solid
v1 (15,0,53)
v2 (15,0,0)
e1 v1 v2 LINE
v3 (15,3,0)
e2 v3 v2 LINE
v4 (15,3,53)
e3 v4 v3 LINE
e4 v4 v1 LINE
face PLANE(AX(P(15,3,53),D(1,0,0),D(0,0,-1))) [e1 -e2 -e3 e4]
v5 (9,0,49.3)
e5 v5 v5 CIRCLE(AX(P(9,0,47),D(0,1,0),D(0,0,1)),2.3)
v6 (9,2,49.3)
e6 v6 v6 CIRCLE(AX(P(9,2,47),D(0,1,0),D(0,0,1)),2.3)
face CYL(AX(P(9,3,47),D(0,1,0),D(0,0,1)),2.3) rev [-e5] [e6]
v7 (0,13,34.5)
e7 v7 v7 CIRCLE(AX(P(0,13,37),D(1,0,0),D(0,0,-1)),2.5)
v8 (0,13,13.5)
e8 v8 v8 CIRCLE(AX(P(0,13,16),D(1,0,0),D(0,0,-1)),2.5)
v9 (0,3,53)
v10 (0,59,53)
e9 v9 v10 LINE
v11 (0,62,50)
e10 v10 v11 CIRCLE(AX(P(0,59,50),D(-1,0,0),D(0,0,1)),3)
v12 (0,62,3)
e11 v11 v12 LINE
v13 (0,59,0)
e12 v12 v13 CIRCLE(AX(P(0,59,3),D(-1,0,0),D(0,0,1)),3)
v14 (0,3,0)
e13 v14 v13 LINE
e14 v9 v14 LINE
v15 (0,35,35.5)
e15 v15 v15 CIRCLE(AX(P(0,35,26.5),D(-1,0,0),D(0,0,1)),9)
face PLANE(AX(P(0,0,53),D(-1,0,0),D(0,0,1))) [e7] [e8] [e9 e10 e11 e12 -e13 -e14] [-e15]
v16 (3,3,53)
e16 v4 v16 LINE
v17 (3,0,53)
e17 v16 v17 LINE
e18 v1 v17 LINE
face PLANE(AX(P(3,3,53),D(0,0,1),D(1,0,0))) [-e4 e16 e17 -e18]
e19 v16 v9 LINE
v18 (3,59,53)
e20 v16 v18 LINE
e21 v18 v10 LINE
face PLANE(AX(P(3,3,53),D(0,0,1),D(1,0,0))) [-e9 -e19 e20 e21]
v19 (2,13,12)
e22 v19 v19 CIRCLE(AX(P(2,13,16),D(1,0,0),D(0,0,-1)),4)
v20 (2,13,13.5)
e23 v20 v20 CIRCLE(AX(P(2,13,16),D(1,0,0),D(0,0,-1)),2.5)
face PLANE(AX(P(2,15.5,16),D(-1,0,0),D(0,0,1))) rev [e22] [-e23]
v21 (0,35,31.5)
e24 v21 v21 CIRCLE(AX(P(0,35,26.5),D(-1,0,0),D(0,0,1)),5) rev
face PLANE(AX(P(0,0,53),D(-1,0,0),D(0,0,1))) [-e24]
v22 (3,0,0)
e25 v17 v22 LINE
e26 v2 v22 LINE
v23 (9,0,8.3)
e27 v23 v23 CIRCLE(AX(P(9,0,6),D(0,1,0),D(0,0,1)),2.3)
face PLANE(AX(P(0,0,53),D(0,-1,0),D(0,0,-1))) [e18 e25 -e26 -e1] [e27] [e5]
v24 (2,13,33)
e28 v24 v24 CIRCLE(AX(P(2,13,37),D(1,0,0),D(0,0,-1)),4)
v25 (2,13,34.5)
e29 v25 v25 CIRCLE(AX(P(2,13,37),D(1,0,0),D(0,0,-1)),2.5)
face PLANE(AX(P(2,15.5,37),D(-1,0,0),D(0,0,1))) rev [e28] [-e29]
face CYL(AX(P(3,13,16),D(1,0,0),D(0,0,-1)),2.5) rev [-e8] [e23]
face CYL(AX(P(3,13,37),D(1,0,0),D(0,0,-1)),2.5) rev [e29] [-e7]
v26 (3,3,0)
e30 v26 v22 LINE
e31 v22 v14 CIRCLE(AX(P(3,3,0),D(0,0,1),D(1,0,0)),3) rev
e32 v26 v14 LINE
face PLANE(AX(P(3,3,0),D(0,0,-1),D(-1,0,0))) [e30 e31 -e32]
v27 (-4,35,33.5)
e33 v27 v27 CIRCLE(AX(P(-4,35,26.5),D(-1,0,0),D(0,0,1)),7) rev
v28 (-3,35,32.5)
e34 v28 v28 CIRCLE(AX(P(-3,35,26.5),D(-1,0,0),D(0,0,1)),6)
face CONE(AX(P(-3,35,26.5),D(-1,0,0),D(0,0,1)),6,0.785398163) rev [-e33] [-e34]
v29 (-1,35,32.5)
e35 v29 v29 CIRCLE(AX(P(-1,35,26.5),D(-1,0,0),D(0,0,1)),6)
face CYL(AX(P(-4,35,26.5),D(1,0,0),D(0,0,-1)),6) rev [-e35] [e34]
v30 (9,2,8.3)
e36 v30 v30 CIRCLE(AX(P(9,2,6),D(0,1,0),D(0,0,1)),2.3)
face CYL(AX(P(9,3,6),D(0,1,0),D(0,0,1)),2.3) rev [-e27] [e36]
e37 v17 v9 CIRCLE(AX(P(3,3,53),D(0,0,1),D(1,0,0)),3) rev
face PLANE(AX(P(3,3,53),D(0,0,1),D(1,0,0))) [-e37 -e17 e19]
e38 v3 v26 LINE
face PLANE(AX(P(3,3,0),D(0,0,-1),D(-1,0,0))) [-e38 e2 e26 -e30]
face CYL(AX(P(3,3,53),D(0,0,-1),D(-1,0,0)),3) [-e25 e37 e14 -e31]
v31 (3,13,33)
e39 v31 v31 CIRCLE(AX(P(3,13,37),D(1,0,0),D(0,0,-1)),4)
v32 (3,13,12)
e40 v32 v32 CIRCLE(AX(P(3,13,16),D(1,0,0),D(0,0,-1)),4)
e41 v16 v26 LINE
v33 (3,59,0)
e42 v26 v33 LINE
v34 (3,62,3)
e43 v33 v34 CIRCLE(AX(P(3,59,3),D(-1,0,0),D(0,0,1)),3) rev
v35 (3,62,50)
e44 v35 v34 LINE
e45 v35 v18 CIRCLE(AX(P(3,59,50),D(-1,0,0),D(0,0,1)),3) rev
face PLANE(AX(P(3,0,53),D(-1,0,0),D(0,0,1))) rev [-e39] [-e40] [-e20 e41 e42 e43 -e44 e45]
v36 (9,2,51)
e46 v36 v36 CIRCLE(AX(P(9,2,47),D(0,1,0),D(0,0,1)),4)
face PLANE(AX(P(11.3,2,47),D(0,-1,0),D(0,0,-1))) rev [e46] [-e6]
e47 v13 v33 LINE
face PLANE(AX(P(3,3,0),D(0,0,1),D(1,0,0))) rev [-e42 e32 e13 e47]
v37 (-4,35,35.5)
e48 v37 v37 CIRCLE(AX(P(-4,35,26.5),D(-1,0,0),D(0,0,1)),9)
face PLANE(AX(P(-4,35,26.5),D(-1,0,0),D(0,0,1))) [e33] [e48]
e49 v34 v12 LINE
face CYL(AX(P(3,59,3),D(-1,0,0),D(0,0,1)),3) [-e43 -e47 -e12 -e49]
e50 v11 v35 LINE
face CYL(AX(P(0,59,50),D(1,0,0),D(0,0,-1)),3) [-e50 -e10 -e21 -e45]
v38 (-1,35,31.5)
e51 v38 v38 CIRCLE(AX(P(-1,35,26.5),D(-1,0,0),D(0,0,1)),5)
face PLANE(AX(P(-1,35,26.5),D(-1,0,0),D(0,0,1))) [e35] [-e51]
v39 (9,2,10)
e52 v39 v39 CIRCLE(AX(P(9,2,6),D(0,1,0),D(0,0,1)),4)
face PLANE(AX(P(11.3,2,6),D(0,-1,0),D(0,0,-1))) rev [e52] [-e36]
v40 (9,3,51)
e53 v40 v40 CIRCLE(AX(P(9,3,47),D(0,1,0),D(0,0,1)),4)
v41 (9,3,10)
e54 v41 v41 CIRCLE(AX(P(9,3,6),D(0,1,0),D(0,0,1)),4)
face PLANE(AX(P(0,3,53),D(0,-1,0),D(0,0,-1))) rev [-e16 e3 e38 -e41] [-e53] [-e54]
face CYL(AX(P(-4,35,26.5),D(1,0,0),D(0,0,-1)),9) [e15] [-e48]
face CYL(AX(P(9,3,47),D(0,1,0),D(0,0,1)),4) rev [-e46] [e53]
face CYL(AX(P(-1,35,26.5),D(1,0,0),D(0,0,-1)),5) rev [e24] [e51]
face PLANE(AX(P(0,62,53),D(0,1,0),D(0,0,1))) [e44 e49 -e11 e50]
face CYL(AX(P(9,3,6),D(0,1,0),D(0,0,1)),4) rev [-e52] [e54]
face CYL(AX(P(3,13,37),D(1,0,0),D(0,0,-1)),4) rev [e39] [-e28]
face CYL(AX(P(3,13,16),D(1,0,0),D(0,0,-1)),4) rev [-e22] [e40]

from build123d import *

# Parameters (mm, degrees)
SM_BASE_FLANGE_1_DEPTH    = 53
SKETCH_7_R                = 9
SKETCH_7_R_2              = 6
EXTRUDE_1_DEPTH           = 4
SKETCH_8_R                = 6
SKETCH_8_R_2              = 5
EXTRUDE_2_DEPTH           = 1
HOLE_WIZARD_1_D           = 4.6
HOLE_WIZARD_1_CBORE_D     = 8
HOLE_WIZARD_1_CBORE_DEPTH = 1
HOLE_WIZARD_2_D           = 5
HOLE_WIZARD_2_DEPTH       = 3
HOLE_WIZARD_2_CBORE_D     = 8
HOLE_WIZARD_2_CBORE_DEPTH = 1
HOLE_WIZARD_2_TIP         = 1.502151548
FILLET_1_R                = 3
CHAMFER_1_SIZE            = 1


# Read off the part's stored shape, not the designer's step: 基体-法兰1
with BuildPart() as part:
    # 基体-法兰1 outline → 基体-法兰1 (new body)
    with BuildSketch(Plane.XY):
        with BuildLine():
            Line((3, 3), (3, 62))
            Line((3, 62), (0, 62))
            Line((0, 62), (0, 3))
            ThreePointArc((0, 3), (0.878679656, 0.878679656), (3, 0))
            Line((3, 0), (15, 0))
            Line((15, 0), (15, 3))
            Line((15, 3), (3, 3))
        make_face()
    extrude(amount=SM_BASE_FLANGE_1_DEPTH)

    # 草图7 → 凸台-拉伸1 (add)
    with BuildSketch(Plane.ZY):
        with Locations((26.5, 35)):
            Circle(SKETCH_7_R)
        with Locations((26.5, 35)):
            Circle(SKETCH_7_R_2, mode=Mode.SUBTRACT)
    extrude(amount=EXTRUDE_1_DEPTH)

    # 草图8 → 凸台-拉伸2 (add)
    with BuildSketch(Plane.ZY):
        with Locations((26.5, 35)):
            Circle(SKETCH_8_R)
        with Locations((26.5, 35)):
            Circle(SKETCH_8_R_2, mode=Mode.SUBTRACT)
    extrude(amount=EXTRUDE_2_DEPTH)

    # 打孔尺寸(%根据)内六角圆柱头螺钉的类型1 (through all)
    with Locations(Plane(origin=(0, 3, 0), x_dir=(1, 0, 0), z_dir=(0, 1, 0))):
        with Locations((9, -6), (9, -47)):
            CounterBoreHole(HOLE_WIZARD_1_D / 2, HOLE_WIZARD_1_CBORE_D / 2, HOLE_WIZARD_1_CBORE_DEPTH)

    # 打孔尺寸(%根据)内六角圆柱头螺钉的类型2
    with Locations(Plane(origin=(3, 0, 0), x_dir=(0, 0, -1), z_dir=(1, 0, 0))):
        with Locations((-37, 13), (-16, 13)):
            CounterBoreHole(HOLE_WIZARD_2_D / 2, HOLE_WIZARD_2_CBORE_D / 2, HOLE_WIZARD_2_CBORE_DEPTH, depth=HOLE_WIZARD_2_DEPTH)
            with Locations((0, 0, -(HOLE_WIZARD_2_DEPTH + HOLE_WIZARD_2_TIP / 2))):  # 118° drill point
                Cone(0, HOLE_WIZARD_2_D / 2, HOLE_WIZARD_2_TIP, mode=Mode.SUBTRACT)

    # 圆角1
    fillet_1_edges = [part.edges().sort_by_distance(p)[0] for p in [
        (1.5, 62, 0),
        (1.5, 62, 53),
    ]]
    fillet(fillet_1_edges, radius=FILLET_1_R)

    # 倒角1
    chamfer_1_edges = [part.edges().sort_by_distance(p)[0] for p in [
        (-4, 35, 20.5),
    ]]
    chamfer(chamfer_1_edges, length=CHAMFER_1_SIZE)


solid = part.part
